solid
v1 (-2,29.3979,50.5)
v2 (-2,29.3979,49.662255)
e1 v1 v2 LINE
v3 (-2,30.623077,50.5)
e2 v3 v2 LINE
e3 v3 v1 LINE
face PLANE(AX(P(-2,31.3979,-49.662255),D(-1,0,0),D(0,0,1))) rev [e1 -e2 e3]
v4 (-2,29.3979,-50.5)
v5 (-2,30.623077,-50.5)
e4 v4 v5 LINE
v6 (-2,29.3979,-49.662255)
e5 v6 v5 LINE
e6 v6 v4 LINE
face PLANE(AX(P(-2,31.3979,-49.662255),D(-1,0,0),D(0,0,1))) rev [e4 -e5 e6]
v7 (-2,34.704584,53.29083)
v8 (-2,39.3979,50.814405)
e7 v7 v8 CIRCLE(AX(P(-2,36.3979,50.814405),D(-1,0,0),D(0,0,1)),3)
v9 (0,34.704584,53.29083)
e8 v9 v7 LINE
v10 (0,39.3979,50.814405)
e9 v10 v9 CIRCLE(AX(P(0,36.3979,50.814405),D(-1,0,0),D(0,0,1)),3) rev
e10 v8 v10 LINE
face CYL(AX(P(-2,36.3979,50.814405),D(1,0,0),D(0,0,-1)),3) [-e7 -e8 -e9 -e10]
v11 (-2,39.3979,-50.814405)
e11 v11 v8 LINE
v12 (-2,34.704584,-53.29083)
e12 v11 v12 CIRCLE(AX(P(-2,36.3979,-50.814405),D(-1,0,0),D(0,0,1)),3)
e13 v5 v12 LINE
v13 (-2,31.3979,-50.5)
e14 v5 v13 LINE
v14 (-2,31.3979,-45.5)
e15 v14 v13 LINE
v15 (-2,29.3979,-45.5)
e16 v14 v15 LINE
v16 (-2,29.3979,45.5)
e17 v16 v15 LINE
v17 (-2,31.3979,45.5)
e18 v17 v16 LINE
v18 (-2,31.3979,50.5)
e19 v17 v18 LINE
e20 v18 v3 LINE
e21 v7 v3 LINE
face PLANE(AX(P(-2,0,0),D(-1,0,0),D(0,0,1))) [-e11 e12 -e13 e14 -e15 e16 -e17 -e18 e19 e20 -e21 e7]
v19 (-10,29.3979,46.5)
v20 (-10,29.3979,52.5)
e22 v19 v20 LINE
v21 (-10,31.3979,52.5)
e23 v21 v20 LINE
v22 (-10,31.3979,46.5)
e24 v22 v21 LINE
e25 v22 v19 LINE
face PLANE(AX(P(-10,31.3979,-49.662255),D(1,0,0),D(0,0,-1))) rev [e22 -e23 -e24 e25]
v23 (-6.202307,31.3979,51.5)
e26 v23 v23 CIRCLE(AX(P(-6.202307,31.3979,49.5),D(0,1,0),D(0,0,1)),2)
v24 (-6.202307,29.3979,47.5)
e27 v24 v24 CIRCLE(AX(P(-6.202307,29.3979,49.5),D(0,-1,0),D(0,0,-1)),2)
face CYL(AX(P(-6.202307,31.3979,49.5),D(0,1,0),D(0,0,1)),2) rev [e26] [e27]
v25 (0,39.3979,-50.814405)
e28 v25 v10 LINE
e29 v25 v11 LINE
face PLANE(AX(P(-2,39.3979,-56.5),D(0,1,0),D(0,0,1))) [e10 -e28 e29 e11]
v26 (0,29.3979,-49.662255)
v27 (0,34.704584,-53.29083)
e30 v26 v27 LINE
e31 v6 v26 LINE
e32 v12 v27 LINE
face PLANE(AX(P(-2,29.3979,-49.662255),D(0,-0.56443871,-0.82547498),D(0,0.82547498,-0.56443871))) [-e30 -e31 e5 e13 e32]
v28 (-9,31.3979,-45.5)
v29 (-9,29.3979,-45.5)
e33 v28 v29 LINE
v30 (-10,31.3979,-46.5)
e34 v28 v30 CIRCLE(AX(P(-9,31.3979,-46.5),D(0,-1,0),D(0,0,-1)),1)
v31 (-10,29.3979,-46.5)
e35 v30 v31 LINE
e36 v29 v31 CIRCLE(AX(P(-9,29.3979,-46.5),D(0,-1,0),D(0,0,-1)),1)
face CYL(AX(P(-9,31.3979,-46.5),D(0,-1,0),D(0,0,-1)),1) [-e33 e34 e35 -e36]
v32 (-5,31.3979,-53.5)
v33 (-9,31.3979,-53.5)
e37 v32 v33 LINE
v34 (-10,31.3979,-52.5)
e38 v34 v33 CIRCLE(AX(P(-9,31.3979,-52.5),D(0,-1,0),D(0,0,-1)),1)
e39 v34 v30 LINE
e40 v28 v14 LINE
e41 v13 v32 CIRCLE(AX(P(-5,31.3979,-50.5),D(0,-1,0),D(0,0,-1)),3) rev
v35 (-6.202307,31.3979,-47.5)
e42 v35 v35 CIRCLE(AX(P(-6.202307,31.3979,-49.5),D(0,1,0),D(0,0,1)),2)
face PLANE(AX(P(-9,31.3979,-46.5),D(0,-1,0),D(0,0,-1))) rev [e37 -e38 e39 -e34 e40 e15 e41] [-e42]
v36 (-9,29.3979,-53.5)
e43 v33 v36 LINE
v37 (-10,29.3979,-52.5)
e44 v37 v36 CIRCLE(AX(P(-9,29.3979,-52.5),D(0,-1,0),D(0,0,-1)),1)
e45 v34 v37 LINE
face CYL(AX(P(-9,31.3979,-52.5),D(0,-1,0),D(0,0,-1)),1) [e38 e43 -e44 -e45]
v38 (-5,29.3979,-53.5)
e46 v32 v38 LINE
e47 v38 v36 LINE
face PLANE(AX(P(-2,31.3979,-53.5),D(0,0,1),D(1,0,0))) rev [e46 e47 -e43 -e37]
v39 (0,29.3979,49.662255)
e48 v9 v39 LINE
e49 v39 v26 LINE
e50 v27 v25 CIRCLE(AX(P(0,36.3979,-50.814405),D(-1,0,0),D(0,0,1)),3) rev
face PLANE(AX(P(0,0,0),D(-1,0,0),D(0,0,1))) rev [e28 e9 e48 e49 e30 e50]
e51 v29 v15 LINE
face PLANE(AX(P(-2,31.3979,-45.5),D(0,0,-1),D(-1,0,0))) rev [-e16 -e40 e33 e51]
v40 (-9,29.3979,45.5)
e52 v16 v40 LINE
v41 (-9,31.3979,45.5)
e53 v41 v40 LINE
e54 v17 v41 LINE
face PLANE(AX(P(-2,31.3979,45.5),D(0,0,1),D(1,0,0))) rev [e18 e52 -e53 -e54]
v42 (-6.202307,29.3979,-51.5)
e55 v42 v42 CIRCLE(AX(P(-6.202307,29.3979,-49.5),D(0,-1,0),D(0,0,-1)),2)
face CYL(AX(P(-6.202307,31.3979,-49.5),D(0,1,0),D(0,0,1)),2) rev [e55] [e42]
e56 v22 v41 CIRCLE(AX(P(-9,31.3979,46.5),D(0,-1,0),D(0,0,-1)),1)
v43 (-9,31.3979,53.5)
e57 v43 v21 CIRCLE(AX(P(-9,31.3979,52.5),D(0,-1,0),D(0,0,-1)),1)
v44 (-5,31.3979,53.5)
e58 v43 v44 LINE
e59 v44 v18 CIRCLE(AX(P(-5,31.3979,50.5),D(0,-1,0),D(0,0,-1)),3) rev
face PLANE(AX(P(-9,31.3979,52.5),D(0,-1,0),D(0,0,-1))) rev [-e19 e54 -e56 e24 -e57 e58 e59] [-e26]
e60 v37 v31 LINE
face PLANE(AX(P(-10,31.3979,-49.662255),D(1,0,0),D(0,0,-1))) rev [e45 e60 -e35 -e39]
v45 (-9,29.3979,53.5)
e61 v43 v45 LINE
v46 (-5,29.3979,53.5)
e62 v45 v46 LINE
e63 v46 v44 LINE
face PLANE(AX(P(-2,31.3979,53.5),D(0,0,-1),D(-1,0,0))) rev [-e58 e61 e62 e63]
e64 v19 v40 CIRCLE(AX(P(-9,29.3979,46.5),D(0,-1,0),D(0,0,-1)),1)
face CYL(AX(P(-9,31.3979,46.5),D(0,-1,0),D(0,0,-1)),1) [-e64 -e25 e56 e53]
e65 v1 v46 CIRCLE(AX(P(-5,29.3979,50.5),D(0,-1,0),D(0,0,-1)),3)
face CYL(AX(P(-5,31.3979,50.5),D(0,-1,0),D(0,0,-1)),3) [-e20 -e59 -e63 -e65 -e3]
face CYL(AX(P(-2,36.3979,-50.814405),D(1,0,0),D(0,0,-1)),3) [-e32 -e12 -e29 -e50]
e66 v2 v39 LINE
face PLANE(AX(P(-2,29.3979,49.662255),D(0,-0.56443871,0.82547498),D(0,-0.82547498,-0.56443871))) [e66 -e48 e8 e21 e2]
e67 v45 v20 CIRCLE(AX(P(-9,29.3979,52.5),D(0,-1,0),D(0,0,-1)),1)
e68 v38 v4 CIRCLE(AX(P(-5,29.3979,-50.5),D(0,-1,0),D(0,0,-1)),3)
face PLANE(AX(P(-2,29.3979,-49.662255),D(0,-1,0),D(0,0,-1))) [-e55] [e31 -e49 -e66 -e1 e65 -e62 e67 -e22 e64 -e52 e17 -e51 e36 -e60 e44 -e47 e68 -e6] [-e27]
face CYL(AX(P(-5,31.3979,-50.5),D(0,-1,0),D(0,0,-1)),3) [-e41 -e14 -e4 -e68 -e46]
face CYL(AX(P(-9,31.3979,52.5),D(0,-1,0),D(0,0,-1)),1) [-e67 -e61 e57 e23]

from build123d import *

# Parameters (mm, degrees)
BASE_FLANGE1_DEPTH               = 2
FILLET1_R                        = 3
BOSS_EXTRUDE1_START              = 29.3979
BOSS_EXTRUDE1_DEPTH              = 2
F_4_0_START                      = 29.397900258
F_4_0_4_DIAMETER_HOLE1_OUTLINE_R = 2
F_4_0_4_DIAMETER_HOLE1_DEPTH     = 2
FILLET2_R                        = 3


# Read off the part's stored shape, not the designer's step: Ø4.0 (4) Diameter Hole1
# Sheet-metal steps are written as plain solids
with BuildPart() as part:
    # Sketch1 → Base-Flange1 (new body)
    with BuildSketch(Plane(origin=(0, 0, 0), x_dir=(0, 0, -1), z_dir=(1, 0, 0))):
        Polygon((49.662255386, 29.397900258), (56.5, 39.397900258), (-56.5, 39.397900258), (-49.662255386, 29.397900258), align=None)
    extrude(amount=-BASE_FLANGE1_DEPTH)

    # Fillet1
    fillet1_edges = [part.edges().sort_by_distance(p)[0] for p in [
        (-1, 39.397900258, 56.5),
        (-1, 39.397900258, -56.5),
    ]]
    fillet(fillet1_edges, radius=FILLET1_R)

    # Sketch2 → Boss-Extrude1 (add)
    with BuildSketch(Plane(origin=(0, 0, 0), x_dir=(1, 0, 0), z_dir=(0, 1, 0)).offset(BOSS_EXTRUDE1_START)):
        with BuildLine():
            Line((-2, 53.5), (-9, 53.5))
            ThreePointArc((-9, 53.5), (-9.707106781, 53.207106781), (-10, 52.5))
            Line((-10, 52.5), (-10, 46.5))
            ThreePointArc((-10, 46.5), (-9.707106781, 45.792893219), (-9, 45.5))
            Line((-9, 45.5), (-2, 45.5))
            Line((-2, 45.5), (-2, 53.5))
        make_face()
        with BuildLine():
            Line((-10, -52.5), (-10, -46.5))
            ThreePointArc((-10, -46.5), (-9.707106781, -45.792893219), (-9, -45.5))
            Line((-9, -45.5), (-2, -45.5))
            Line((-2, -45.5), (-2, -53.5))
            Line((-2, -53.5), (-9, -53.5))
            ThreePointArc((-9, -53.5), (-9.707106781, -53.207106781), (-10, -52.5))
        make_face()
    extrude(amount=BOSS_EXTRUDE1_DEPTH)

    # Ø4.0 (4) Diameter Hole1 outline → Ø4.0 (4) Diameter Hole1 (cut)
    with BuildSketch(Plane(origin=(0, 0, 0), x_dir=(1, 0, 0), z_dir=(0, 1, 0)).offset(F_4_0_START)):
        with Locations((-6.20230671, -49.5)):
            Circle(F_4_0_4_DIAMETER_HOLE1_OUTLINE_R)
        with Locations((-6.20230671, 49.5)):
            Circle(F_4_0_4_DIAMETER_HOLE1_OUTLINE_R)
    extrude(amount=F_4_0_4_DIAMETER_HOLE1_DEPTH, mode=Mode.SUBTRACT)

    # Fillet2
    # the kernel refuses this fillet: 3 mm, written as the material it takes off along each edge
    with BuildSketch(Plane(origin=(-2, 21.8979, -53.5), x_dir=(0, 0, 1), z_dir=(0, 1, 0))) as fillet2_piece_1:
        with BuildLine():
            CenterArc((FILLET2_R, -FILLET2_R), FILLET2_R, 90, 90)
            Line((0, -FILLET2_R), (0, 0))
            Line((0, 0), (FILLET2_R, 0))
        make_face()
    extrude(amount=17, mode=Mode.SUBTRACT)
    with BuildSketch(Plane(origin=(-2, 21.8979, 53.5), x_dir=(0, 0, -1), z_dir=(0, 1, 0))) as fillet2_piece_2:
        with BuildLine():
            CenterArc((FILLET2_R, FILLET2_R), FILLET2_R, 180, 90)
            Line((0, FILLET2_R), (0, 0))
            Line((0, 0), (FILLET2_R, 0))
        make_face()
    extrude(amount=17, mode=Mode.SUBTRACT)


solid = part.part
